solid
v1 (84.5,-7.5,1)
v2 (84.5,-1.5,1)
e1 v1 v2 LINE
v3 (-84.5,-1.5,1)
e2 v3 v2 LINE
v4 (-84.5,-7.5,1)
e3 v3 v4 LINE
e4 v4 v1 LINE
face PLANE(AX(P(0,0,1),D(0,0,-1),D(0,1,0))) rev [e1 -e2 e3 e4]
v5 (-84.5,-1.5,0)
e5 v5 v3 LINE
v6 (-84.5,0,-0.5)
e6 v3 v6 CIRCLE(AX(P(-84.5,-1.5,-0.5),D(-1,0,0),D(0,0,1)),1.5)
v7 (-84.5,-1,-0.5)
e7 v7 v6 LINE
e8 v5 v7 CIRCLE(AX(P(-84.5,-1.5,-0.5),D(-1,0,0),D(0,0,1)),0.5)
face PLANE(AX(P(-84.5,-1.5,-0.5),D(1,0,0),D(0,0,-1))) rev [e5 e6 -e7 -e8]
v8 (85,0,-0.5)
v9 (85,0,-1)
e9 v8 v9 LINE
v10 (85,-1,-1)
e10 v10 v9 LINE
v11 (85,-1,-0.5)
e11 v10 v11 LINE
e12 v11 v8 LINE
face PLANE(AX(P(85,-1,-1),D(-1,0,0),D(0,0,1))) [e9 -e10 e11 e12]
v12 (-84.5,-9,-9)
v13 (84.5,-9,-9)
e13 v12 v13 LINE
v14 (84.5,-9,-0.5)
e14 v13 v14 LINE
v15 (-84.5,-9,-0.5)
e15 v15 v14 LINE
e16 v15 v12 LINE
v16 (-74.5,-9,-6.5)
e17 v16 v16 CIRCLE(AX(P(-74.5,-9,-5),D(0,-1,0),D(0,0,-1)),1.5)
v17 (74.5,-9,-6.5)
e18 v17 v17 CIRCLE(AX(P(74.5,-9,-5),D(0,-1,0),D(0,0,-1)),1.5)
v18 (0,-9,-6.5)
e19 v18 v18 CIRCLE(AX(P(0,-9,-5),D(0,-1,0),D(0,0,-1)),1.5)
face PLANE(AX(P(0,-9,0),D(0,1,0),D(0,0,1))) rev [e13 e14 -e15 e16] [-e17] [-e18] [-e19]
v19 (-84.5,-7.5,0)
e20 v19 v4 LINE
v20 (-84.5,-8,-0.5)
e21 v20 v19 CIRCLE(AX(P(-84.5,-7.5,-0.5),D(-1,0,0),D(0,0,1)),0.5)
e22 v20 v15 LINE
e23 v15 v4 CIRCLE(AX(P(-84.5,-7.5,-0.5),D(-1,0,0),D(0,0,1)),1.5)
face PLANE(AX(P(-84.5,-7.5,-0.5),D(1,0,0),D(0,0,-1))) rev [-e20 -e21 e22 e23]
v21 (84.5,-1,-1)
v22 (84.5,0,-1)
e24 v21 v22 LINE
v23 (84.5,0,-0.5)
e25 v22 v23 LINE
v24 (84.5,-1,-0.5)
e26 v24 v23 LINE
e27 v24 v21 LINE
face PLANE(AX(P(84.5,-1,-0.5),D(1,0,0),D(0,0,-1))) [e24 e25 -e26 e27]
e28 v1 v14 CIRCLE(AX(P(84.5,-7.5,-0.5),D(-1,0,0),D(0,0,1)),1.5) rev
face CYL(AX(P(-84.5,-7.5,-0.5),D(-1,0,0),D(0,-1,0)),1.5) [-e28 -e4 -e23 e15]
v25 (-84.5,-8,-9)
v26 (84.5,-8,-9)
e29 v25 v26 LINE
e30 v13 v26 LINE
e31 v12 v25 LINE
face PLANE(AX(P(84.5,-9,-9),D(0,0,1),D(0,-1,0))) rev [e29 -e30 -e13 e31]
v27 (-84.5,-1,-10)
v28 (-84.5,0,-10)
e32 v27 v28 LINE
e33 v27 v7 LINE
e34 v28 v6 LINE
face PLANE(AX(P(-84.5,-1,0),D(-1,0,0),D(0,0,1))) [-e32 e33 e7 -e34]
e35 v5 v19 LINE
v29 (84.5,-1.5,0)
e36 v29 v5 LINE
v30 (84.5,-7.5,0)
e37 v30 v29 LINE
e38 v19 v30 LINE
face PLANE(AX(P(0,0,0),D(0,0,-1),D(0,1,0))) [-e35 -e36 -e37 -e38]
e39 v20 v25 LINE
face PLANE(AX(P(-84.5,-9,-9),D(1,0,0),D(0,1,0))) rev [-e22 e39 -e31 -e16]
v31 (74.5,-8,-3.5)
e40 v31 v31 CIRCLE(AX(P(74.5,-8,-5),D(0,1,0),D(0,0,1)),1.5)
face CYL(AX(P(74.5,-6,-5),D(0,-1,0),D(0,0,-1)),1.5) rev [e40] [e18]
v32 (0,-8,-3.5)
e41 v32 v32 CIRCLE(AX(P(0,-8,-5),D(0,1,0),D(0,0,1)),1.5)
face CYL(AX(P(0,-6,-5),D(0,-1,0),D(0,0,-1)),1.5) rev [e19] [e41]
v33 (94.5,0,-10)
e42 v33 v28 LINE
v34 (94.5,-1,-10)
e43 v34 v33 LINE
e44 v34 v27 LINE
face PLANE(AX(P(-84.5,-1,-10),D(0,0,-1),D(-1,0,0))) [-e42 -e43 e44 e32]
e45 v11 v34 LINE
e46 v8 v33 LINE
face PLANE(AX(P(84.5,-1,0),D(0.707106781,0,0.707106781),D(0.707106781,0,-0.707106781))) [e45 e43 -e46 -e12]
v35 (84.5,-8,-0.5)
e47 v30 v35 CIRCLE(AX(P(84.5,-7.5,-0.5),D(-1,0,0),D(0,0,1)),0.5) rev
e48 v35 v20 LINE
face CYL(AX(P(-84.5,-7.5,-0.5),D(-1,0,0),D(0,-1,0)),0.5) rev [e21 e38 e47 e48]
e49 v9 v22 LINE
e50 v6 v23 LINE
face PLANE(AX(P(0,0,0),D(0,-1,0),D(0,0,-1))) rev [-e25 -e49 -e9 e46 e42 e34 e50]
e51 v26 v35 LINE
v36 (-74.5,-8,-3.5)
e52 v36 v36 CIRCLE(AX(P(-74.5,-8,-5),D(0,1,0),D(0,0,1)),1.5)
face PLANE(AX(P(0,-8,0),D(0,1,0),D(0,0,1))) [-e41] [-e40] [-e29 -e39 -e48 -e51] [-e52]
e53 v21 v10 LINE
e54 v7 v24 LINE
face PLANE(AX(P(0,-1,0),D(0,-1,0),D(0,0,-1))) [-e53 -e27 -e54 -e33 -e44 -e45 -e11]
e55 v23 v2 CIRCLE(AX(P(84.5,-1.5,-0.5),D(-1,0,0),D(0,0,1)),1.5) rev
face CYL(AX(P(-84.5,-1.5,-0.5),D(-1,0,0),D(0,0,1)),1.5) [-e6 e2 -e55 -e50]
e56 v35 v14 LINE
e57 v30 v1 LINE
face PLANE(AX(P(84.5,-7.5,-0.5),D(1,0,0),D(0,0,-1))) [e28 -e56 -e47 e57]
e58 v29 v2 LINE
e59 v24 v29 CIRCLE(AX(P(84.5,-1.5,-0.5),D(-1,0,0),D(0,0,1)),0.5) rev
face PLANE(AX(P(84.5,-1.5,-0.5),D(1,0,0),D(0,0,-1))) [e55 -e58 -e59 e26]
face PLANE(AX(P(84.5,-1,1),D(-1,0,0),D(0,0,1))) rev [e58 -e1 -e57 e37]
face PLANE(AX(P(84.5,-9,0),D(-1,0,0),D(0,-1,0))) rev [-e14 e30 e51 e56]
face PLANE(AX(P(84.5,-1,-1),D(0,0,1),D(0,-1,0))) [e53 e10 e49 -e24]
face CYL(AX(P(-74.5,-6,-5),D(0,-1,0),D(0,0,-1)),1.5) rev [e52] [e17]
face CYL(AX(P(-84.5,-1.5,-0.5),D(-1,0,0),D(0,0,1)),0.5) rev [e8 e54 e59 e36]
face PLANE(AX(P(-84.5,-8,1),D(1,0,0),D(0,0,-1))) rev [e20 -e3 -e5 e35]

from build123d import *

# Parameters (mm, degrees)
BASE_FLANGE1_DEPTH            = 1
EDGE_FLANGE1_STRIP_W          = 5
EDGE_FLANGE1_STRIP_H          = 1
EDGE_FLANGE1_STRIP_CUT_DEPTH  = 169
EDGE_FLANGE1_RELIEF_W         = 5.5
EDGE_FLANGE1_RELIEF_H         = 0.5
EDGE_FLANGE1_RELIEF_CUT_DEPTH = 1
EDGE_FLANGE1_DEPTH            = 169
EDGE_FLANGE2_STRIP_W          = 5
EDGE_FLANGE2_STRIP_H          = 1
EDGE_FLANGE2_STRIP_CUT_DEPTH  = 169
EDGE_FLANGE2_DEPTH            = 169
SKETCH12_R                    = 1.5
CUT_EXTRUDE1_DEPTH            = 3


# Sheet-metal steps are written as plain solids
with BuildPart() as part:
    # Sketch1 → Base-Flange1 (new body)
    with BuildSketch(Plane(origin=(0, 0, 0), x_dir=(1, 0, 0), z_dir=(0, 1, 0))):
        Polygon((-84.5, 0), (84.5, 0), (94.5, 10), (-84.5, 10), align=None)
    extrude(amount=-BASE_FLANGE1_DEPTH)

    # Edge-Flange1 strip (across the edge) → Edge-Flange1 strip cut (cut)
    with BuildSketch(Plane(origin=(84.5, -1, 0), x_dir=(0, 0, -1), z_dir=(-1, 0, 0))):
        with Locations((-2, -0.5)):
            Rectangle(EDGE_FLANGE1_STRIP_W, EDGE_FLANGE1_STRIP_H)
    extrude(amount=EDGE_FLANGE1_STRIP_CUT_DEPTH, mode=Mode.SUBTRACT)

    # Edge-Flange1 relief (on the sheet) → Edge-Flange1 relief cut (cut)
    with BuildSketch(Plane(origin=(84.5, -1, -0.5), x_dir=(0, 0, -1), z_dir=(0, -1, 0))):
        with Locations((-2.25, 0.25)):
            Rectangle(EDGE_FLANGE1_RELIEF_W, EDGE_FLANGE1_RELIEF_H)
    extrude(amount=-EDGE_FLANGE1_RELIEF_CUT_DEPTH, mode=Mode.SUBTRACT)

    # Edge-Flange1 section (across the edge) → Edge-Flange1 (add)
    with BuildSketch(Plane(origin=(84.5, -1, 0), x_dir=(0, 0, -1), z_dir=(-1, 0, 0))):
        with BuildLine():
            Line((-1, 0.5), (-1, 7))
            Line((-1, 7), (0, 7))
            Line((0, 7), (0, 0.5))
            ThreePointArc((0, 0.5), (0.146446609, 0.146446609), (0.5, 0))
            Line((0.5, 0), (0.5, -1))
            ThreePointArc((0.5, -1), (-0.560660172, -0.560660172), (-1, 0.5))
        make_face()
    extrude(amount=EDGE_FLANGE1_DEPTH)

    # Edge-Flange2 strip (across the edge) → Edge-Flange2 strip cut (cut)
    with BuildSketch(Plane(origin=(84.5, -8, 0), x_dir=(0, 1, 0), z_dir=(-1, 0, 0))):
        with Locations((-2, -0.5)):
            Rectangle(EDGE_FLANGE2_STRIP_W, EDGE_FLANGE2_STRIP_H)
    extrude(amount=EDGE_FLANGE2_STRIP_CUT_DEPTH, mode=Mode.SUBTRACT)

    # Edge-Flange2 section (across the edge) → Edge-Flange2 (add)
    with BuildSketch(Plane(origin=(84.5, -8, 0), x_dir=(0, 1, 0), z_dir=(-1, 0, 0))):
        with BuildLine():
            Line((-1, 0.5), (-1, 9))
            Line((-1, 9), (0, 9))
            Line((0, 9), (0, 0.5))
            ThreePointArc((0, 0.5), (0.146446609, 0.146446609), (0.5, 0))
            Line((0.5, 0), (0.5, -1))
            ThreePointArc((0.5, -1), (-0.560660172, -0.560660172), (-1, 0.5))
        make_face()
    extrude(amount=EDGE_FLANGE2_DEPTH)

    # Sketch12 → Cut-Extrude1 (cut)
    with BuildSketch(Plane.XZ.offset(9)):
        with Locations(Location((-74.5, -5, 0), (0, 0, 270))):
            Circle(SKETCH12_R)
        with Locations(Location((0, -5, 0), (0, 0, 270))):
            Circle(SKETCH12_R)
        with Locations(Location((74.5, -5, 0), (0, 0, 270))):
            Circle(SKETCH12_R)
    extrude(amount=-CUT_EXTRUDE1_DEPTH, mode=Mode.SUBTRACT)


solid = part.part
